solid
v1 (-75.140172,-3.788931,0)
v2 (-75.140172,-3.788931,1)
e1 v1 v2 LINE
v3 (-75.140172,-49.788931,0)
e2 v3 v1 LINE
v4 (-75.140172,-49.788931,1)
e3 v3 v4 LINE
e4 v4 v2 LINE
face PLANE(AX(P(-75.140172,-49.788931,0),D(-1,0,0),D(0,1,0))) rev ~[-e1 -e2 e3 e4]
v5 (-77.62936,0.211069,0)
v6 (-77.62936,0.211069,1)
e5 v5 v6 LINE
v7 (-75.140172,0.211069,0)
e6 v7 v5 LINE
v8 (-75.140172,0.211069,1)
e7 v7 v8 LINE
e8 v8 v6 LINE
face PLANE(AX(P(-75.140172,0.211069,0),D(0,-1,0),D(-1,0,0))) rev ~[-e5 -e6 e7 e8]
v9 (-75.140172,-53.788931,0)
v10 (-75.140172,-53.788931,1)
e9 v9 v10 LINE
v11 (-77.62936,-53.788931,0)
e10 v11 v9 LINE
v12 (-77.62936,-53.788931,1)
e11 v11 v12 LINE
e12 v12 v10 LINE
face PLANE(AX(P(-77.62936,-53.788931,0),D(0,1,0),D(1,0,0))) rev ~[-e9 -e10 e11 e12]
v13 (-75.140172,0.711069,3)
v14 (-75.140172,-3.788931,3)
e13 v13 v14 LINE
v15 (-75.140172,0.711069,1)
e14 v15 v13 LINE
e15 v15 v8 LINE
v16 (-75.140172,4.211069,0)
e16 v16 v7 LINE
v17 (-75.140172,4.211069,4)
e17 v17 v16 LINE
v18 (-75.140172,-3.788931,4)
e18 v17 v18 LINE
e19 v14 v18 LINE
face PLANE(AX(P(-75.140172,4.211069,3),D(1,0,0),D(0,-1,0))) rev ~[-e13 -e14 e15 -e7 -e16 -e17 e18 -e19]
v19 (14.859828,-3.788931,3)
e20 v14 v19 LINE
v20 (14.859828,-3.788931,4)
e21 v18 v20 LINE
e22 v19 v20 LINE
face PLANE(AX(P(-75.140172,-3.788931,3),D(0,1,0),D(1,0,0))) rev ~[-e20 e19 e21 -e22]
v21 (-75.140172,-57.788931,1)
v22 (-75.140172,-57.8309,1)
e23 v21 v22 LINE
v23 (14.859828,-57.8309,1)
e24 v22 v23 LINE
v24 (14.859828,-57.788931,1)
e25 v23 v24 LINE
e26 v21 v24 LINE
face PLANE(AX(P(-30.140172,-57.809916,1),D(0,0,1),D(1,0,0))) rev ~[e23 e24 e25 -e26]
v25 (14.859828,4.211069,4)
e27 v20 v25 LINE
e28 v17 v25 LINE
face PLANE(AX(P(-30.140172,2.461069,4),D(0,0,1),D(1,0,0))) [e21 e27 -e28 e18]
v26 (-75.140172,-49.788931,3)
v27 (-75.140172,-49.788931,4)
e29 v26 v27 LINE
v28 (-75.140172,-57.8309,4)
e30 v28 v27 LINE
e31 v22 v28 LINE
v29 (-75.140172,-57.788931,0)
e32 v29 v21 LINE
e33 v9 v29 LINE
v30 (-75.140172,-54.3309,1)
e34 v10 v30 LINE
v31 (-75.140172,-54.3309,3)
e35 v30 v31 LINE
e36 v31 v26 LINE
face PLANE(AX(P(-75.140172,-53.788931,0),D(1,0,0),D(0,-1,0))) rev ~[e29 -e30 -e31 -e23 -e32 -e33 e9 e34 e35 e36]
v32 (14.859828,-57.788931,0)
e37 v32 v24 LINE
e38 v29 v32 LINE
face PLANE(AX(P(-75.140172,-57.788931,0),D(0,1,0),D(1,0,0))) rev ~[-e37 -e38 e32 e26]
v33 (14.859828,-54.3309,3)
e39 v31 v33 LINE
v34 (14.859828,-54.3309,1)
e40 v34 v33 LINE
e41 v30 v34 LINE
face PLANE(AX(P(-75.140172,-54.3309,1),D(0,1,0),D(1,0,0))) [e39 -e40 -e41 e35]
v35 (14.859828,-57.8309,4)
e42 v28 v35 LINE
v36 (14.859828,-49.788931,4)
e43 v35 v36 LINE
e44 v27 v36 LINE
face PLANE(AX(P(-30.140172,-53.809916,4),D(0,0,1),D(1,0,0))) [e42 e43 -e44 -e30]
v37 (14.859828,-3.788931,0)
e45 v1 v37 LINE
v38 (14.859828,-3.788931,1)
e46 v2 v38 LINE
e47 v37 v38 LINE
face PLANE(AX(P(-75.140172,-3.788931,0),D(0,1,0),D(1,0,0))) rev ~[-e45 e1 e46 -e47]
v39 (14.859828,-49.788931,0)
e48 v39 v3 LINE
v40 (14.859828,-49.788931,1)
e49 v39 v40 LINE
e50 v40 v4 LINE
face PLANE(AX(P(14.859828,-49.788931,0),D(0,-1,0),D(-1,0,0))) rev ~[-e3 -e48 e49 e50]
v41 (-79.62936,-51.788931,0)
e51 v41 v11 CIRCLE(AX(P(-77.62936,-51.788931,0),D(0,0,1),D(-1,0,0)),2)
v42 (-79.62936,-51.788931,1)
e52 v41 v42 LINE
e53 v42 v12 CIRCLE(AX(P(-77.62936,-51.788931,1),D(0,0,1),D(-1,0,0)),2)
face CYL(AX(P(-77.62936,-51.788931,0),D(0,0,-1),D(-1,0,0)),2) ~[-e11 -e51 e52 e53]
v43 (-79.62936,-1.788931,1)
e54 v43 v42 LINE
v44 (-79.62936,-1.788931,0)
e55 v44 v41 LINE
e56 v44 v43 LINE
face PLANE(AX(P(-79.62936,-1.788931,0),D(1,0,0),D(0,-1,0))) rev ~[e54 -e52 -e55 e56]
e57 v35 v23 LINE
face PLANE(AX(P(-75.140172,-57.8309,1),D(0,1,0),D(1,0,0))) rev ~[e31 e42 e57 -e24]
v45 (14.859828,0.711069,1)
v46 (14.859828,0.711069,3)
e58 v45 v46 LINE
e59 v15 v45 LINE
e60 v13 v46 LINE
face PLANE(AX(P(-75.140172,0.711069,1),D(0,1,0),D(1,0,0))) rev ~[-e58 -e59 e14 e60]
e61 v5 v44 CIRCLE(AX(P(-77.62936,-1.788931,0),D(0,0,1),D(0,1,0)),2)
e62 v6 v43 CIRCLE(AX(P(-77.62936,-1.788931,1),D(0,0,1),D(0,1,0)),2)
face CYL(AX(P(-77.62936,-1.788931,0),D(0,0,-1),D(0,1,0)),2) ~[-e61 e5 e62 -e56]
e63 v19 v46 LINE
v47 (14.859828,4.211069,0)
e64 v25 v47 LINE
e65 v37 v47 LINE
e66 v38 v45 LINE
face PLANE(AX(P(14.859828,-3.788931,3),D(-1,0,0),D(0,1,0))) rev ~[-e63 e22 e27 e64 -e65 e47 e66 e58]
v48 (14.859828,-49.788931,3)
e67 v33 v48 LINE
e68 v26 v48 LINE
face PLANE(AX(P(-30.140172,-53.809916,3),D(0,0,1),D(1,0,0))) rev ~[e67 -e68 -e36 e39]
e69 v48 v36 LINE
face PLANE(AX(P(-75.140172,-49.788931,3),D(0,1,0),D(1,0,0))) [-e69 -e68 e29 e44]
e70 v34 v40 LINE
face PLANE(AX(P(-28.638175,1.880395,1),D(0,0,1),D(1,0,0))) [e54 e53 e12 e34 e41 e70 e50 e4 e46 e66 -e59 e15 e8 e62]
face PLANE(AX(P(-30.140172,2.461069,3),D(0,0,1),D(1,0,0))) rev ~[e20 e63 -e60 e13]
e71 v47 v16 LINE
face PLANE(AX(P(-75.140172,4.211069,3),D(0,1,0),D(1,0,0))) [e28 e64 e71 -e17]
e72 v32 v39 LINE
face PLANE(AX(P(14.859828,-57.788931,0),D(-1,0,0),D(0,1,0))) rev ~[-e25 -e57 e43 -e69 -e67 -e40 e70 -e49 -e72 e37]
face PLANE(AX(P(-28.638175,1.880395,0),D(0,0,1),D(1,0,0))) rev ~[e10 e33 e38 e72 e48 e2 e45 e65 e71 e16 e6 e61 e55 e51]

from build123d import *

# Parameters (mm, degrees)
F2_DEPTH = 1
F3_W     = 90
F3_H     = 3.5
F3_H_2   = 0.0419686139
F3_H_3   = 3.4580313861
F4_DEPTH = 2
F5_W     = 90
F5_H     = 3.5
F5_H_2   = 4.5
F5_H_3   = 8.0419686139
F6_DEPTH = 1


# Not quite as in the source:
# - a feature names something its author has since deleted; it is built from what else it names


with BuildPart() as f2:
    # F1 (on face) → F2 (new body)
    with BuildSketch(Plane.XY):
        with BuildLine():
            Line((14.8598281033, 4.21106866), (-75.1401718967, 4.21106866))
            Line((-75.1401718967, 4.21106866), (-75.1401718967, 0.21106866))
            Line((-75.1401718967, 0.21106866), (4.3706398308, 0.21106866))
            ThreePointArc((4.3706398308, 0.21106866), (5.7848533932, -0.3747177776), (6.3706398308, -1.78893134))
            Line((6.3706398308, -1.78893134), (6.3706398308, -3.78893134))
            Line((6.3706398308, -3.78893134), (14.8598281033, -3.78893134))
            Line((14.8598281033, -3.78893134), (14.8598281033, 4.21106866))
        make_face()
        with BuildLine():
            Line((14.8598281033, -49.78893134), (6.3706398308, -49.78893134))
            Line((6.3706398308, -49.78893134), (6.3706398308, -51.78893134))
            ThreePointArc((6.3706398308, -51.78893134), (5.7848533932, -53.2031449024), (4.3706398308, -53.78893134))
            Line((4.3706398308, -53.78893134), (-75.1401718967, -53.78893134))
            Line((-75.1401718967, -53.78893134), (-75.1401718967, -57.78893134))
            Line((-75.1401718967, -57.78893134), (14.8598281033, -57.78893134))
            Line((14.8598281033, -57.78893134), (14.8598281033, -49.78893134))
        make_face()
        with BuildLine():
            Line((-75.1401718967, -3.78893134), (-75.1401718967, 0.21106866))
            Line((-75.1401718967, 0.21106866), (-77.6293601692, 0.21106866))
            ThreePointArc((-77.6293601692, 0.21106866), (-79.0435737315, -0.3747177776), (-79.6293601692, -1.78893134))
            Line((-79.6293601692, -1.78893134), (-79.6293601692, -51.78893134))
            ThreePointArc((-79.6293601692, -51.78893134), (-79.0435737315, -53.2031449024), (-77.6293601692, -53.78893134))
            Line((-77.6293601692, -53.78893134), (-75.1401718967, -53.78893134))
            Line((-75.1401718967, -53.78893134), (-75.1401718967, -49.78893134))
            Line((-75.1401718967, -49.78893134), (-75.1401718967, -3.78893134))
        make_face()
        with BuildLine():
            Line((-68.8141618371, -49.78893134), (-75.1401718967, -49.78893134))
            Line((-75.1401718967, -49.78893134), (-75.1401718967, -53.78893134))
            Line((-75.1401718967, -53.78893134), (4.3706398308, -53.78893134))
            ThreePointArc((4.3706398308, -53.78893134), (5.7848533932, -53.2031449024), (6.3706398308, -51.78893134))
            Line((6.3706398308, -51.78893134), (6.3706398308, -49.78893134))
            Line((6.3706398308, -49.78893134), (6.1858381629, -49.78893134))
            Line((6.1858381629, -49.78893134), (0.4592296318, -49.78893134))
            Line((0.4592296318, -49.78893134), (-68.8141618371, -49.78893134))
        make_face()
        with BuildLine():
            Line((4.3706398308, 0.21106866), (-75.1401718967, 0.21106866))
            Line((-75.1401718967, 0.21106866), (-75.1401718967, -3.78893134))
            Line((-75.1401718967, -3.78893134), (-68.8141618371, -3.78893134))
            Line((-68.8141618371, -3.78893134), (6.1858381629, -3.78893134))
            Line((6.1858381629, -3.78893134), (6.3706398308, -3.78893134))
            Line((6.3706398308, -3.78893134), (6.3706398308, -1.78893134))
            ThreePointArc((6.3706398308, -1.78893134), (5.7848533932, -0.3747177776), (4.3706398308, 0.21106866))
        make_face()
    extrude(amount=F2_DEPTH)

    # F3 (on face) → F4 (join)
    with BuildSketch(Plane.XY.offset(1)):
        with Locations((-30.1401718967, 2.46106866)):
            Rectangle(F3_W, F3_H)
        with Locations((-30.1401718967, -57.8099156469)):
            Rectangle(F3_W, F3_H_2)
        with Locations((-30.1401718967, -56.0599156469)):
            Rectangle(F3_W, F3_H_3)
    extrude(amount=F4_DEPTH)

    # F5 (on face) → F6 (join)
    with BuildSketch(Plane.XY.offset(3)):
        with Locations((-30.1401718967, 2.46106866)):
            Rectangle(F5_W, F5_H)
        with Locations((-30.1401718967, -1.53893134)):
            Rectangle(F5_W, F5_H_2)
        with Locations((-30.1401718967, -53.8099156469)):
            Rectangle(F5_W, F5_H_3)
    extrude(amount=F6_DEPTH)


solid = f2.part
